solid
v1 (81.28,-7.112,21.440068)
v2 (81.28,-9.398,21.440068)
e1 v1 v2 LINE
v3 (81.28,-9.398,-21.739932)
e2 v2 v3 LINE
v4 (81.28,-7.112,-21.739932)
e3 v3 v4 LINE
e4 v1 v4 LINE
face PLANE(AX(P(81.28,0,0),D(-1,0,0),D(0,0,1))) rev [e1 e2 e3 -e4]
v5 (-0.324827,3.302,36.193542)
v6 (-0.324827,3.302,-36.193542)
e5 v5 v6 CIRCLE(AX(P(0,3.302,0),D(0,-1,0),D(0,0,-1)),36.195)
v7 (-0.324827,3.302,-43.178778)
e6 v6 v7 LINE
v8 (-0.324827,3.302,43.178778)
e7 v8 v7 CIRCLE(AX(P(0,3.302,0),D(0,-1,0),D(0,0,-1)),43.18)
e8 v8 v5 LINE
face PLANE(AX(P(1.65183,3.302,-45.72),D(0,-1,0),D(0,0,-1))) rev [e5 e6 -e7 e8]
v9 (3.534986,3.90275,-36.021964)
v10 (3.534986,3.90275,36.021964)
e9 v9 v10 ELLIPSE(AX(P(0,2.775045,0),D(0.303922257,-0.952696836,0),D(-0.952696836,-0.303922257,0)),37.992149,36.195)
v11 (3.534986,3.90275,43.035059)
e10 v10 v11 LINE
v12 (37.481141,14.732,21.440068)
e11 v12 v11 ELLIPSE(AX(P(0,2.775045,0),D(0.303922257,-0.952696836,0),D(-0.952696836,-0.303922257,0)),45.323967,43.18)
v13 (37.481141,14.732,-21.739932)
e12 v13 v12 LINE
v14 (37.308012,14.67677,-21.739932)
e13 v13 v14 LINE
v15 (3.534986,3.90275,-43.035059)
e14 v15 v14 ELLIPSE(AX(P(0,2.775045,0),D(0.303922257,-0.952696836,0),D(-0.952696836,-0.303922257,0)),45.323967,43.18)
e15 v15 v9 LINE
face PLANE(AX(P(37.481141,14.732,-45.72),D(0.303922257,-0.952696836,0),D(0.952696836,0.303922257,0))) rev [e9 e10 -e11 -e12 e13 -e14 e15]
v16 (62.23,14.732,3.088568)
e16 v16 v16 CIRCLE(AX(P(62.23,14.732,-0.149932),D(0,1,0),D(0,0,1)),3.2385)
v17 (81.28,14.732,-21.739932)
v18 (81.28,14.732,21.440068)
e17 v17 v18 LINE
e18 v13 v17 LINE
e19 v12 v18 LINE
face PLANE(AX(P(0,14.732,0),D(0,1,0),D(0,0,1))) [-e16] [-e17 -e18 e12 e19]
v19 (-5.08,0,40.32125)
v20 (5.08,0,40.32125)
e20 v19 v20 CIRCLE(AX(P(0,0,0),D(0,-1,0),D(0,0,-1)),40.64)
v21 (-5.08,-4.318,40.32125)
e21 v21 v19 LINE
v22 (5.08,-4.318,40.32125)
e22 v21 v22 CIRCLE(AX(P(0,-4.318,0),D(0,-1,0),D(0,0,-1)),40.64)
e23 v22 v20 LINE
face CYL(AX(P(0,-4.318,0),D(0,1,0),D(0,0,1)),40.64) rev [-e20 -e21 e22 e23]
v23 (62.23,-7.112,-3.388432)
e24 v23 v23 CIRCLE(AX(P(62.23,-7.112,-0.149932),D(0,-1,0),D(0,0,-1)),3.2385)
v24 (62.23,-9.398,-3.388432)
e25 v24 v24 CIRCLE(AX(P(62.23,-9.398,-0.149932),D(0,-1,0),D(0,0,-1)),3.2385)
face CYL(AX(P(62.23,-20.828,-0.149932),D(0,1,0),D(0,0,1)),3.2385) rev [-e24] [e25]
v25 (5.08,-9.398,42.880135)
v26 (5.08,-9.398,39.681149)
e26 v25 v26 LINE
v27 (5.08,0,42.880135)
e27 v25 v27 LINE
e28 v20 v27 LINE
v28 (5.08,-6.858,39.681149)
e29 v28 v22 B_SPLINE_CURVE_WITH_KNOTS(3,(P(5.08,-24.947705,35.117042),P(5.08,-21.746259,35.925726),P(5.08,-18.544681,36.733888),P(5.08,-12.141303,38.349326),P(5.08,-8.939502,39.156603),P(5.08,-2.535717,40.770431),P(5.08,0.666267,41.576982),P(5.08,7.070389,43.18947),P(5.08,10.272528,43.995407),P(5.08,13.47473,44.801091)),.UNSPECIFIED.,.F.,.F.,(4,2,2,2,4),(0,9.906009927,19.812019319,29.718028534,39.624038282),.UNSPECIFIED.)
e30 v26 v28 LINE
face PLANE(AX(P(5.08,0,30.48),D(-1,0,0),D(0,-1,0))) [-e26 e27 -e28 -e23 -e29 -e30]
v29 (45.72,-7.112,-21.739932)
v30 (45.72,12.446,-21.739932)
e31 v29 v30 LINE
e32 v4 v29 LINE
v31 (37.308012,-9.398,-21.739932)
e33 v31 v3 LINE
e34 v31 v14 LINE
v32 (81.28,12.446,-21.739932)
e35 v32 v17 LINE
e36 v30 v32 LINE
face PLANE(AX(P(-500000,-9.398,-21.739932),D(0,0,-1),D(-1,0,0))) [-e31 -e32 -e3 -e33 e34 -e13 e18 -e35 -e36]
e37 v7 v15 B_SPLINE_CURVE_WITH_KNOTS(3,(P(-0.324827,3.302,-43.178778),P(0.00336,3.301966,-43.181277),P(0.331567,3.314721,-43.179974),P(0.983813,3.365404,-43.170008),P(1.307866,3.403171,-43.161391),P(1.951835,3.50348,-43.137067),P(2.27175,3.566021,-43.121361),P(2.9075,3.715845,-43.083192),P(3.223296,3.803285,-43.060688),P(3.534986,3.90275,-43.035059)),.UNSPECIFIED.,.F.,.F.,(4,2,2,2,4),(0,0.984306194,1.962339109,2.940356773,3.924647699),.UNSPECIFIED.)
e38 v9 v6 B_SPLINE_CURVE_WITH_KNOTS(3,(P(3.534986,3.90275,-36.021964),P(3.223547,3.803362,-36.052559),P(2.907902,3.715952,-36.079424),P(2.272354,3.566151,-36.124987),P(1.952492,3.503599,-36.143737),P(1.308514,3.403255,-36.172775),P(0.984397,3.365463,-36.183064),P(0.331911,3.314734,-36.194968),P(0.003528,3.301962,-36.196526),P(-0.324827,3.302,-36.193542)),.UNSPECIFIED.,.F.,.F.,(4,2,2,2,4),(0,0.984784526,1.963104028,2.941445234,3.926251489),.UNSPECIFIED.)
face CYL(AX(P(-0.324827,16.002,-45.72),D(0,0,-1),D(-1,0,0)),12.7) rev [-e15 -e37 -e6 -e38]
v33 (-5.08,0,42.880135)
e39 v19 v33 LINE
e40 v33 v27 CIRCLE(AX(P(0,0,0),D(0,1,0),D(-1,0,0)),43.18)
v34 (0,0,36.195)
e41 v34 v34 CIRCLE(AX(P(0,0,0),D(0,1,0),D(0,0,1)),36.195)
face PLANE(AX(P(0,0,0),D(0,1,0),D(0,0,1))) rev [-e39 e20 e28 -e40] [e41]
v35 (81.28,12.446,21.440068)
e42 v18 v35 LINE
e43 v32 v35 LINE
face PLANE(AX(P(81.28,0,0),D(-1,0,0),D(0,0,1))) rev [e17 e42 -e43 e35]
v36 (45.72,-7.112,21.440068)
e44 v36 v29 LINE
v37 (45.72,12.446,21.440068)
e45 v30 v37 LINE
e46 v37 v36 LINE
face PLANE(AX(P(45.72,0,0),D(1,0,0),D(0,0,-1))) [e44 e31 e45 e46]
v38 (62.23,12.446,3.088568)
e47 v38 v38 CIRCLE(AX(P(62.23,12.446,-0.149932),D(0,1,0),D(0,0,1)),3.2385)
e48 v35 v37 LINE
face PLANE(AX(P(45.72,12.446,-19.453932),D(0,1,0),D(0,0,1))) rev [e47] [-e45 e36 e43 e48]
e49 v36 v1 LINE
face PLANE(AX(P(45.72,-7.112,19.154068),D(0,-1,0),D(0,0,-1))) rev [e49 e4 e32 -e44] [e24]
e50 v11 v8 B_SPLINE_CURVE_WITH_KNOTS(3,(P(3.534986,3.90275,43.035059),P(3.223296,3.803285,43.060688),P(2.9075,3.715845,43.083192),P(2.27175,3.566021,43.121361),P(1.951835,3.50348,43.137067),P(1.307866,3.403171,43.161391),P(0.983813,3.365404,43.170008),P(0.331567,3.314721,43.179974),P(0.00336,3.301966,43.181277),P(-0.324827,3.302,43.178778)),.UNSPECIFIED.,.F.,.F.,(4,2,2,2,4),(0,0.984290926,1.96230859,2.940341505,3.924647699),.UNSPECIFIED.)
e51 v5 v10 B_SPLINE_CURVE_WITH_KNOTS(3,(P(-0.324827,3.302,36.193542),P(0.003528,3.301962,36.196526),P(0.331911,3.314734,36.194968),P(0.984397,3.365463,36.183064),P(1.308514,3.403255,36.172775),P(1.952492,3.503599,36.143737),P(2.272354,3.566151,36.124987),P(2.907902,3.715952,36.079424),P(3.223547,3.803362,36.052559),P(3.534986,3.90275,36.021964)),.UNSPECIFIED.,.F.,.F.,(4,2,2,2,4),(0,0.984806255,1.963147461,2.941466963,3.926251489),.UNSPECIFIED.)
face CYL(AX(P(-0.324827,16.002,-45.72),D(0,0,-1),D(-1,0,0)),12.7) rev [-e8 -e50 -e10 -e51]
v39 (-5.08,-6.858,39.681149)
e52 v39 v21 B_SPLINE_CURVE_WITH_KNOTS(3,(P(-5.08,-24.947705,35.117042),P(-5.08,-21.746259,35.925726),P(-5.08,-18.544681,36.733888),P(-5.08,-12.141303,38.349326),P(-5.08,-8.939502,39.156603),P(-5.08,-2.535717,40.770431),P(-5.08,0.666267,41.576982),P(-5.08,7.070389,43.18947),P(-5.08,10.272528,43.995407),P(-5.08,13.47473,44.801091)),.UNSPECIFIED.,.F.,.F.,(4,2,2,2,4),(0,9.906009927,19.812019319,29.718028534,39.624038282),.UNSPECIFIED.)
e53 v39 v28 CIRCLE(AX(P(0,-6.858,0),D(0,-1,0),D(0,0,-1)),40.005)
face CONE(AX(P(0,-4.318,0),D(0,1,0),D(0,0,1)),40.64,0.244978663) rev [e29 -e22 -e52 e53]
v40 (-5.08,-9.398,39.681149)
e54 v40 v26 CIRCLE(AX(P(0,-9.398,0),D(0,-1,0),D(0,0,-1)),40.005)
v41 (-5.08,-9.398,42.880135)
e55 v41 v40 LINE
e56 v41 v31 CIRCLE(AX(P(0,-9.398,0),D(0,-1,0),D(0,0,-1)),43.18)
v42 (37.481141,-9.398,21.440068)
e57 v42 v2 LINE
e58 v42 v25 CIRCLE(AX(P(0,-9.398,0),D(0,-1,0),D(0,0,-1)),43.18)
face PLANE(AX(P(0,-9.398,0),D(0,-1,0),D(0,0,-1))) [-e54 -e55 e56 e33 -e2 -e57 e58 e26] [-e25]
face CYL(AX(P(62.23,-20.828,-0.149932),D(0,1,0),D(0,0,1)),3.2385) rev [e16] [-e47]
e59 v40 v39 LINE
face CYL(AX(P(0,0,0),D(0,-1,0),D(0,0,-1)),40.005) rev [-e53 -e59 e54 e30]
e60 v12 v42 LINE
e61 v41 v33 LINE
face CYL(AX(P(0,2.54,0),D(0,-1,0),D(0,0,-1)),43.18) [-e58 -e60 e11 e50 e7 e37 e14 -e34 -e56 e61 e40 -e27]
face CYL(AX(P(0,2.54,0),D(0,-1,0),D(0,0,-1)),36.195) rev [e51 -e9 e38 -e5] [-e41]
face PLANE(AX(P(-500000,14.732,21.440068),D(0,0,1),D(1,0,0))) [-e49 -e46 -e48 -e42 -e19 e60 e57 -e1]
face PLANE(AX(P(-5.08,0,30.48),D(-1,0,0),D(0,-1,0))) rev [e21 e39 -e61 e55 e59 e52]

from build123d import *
from build123d.topology import SkipClean

# Parameters (mm, degrees)
SKETCH1_R                = 43.18
SKETCH1_R_2              = 38.1
SKETCH1_R_3              = 36.195
BOSS_EXTRUDE1_DEPTH      = 2.54
BOSS_EXTRUDE2_START      = 4.318
SKETCH2_R                = 43.18
SKETCH2_R_2              = 40.64
BOSS_EXTRUDE2_DEPTH      = 4.318
SKETCH7_W                = 5.08
SKETCH7_H                = 10.16
CUT_EXTRUDE1_DEPTH       = 12.7
SKETCH12_R               = 43.18
SKETCH12_R_2             = 36.195
BOSS_EXTRUDE3_DEPTH      = 12.192
BOSS_EXTRUDE4_REACH      = 99.671
BOSS_EXTRUDE4_END_RADIUS = 43.18
SKETCH13_W               = 43.18
SKETCH13_H               = 24.13
BOSS_EXTRUDE5_DEPTH      = 38.1
SKETCH14_W               = 38.608
SKETCH14_H               = 19.558
CUT_EXTRUDE2_DEPTH       = 35.56
SKETCH17_R               = 3.2385
CUT_EXTRUDE3_DEPTH       = 35.56
CUT_EXTRUDE5_DEPTH       = 88.9
FILLET1_R                = 12.7
SKETCH23_W               = 35.56
SKETCH23_H               = 19.558
CUT_EXTRUDE6_DEPTH       = 50.8


with BuildPart() as part:
    # Sketch1 → Boss-Extrude1 (new body)
    # profile 1 of 2: a face of its own
    with BuildSketch(Plane(origin=(0, 0, 0), x_dir=(1, 0, 0), z_dir=(0, 1, 0))):
        with Locations(Location((0, 0, 0), (0, 0, 270))):
            Circle(SKETCH1_R)
        Circle(SKETCH1_R_2, mode=Mode.SUBTRACT)
    # profile 2 of 2: a face of its own
    with BuildSketch(Plane(origin=(0, 0, 0), x_dir=(1, 0, 0), z_dir=(0, 1, 0))):
        Circle(SKETCH1_R_2)
        with Locations(Location((0, 0, 0), (0, 0, 270))):
            Circle(SKETCH1_R_3, mode=Mode.SUBTRACT)
    extrude(amount=BOSS_EXTRUDE1_DEPTH)

    # Sketch2 → Boss-Extrude2 (add)
    with BuildSketch(Plane.XZ.offset(BOSS_EXTRUDE2_START)):
        with Locations(Location((0, 0, 0), (0, 0, 270))):
            Circle(SKETCH2_R)
        with Locations(Location((0, 0, 0), (0, 0, 270))):
            Circle(SKETCH2_R_2, mode=Mode.SUBTRACT)
    extrude(amount=-BOSS_EXTRUDE2_DEPTH)

    # Sketch3 → Revolve1 (revolve)
    with BuildSketch(Plane.XY, mode=Mode.PRIVATE) as revolve1_sk:
        Polygon((-40.64, -4.318), (-43.18, -4.318), (-43.18, -9.398), (-40.005, -9.398), (-40.005, -6.858), align=None)
    revolve(revolve1_sk.sketch.rotate(Axis((0, 0, 0), (0, 1, 0)), 270), axis=Axis((0, 0, 0), (0, 1, 0)))

    # Sketch7 → Cut-Extrude1 (cut)
    with SkipClean():  # the faces are left unmerged after this step: merging them gives an invalid solid
        with BuildSketch(Plane.XY.offset(43.18)):
            with Locations((-2.54, -5.08)):
                Rectangle(SKETCH7_W, SKETCH7_H)
            with Locations((2.54, -5.08)):
                Rectangle(SKETCH7_W, SKETCH7_H)
        extrude(amount=-CUT_EXTRUDE1_DEPTH, mode=Mode.SUBTRACT)

    # Sketch12 → Boss-Extrude3 (add)
    with SkipClean():  # the faces are left unmerged after this step: merging them gives an invalid solid
        with BuildSketch(Plane(origin=(0, 2.54, 0), x_dir=(1, 0, 0), z_dir=(0, 1, 0))):
            with Locations(Location((0, 0, 0), (0, 0, 263.243672969))):
                Circle(SKETCH12_R)
            with Locations(Location((0, 0, 0), (0, 0, 270))):
                Circle(SKETCH12_R_2, mode=Mode.SUBTRACT)
        extrude(amount=BOSS_EXTRUDE3_DEPTH)

    # Boss-Extrude4: up to this cylinder (the profile starts outside it)
    with SkipClean():  # the faces are left unmerged after this step: merging them gives an invalid solid
        boss_extrude4_end = Plane(origin=(0, 2.667, 0), z_dir=(0, -1, 0)) * Cylinder(BOSS_EXTRUDE4_END_RADIUS, 286.702, mode=Mode.PRIVATE)
        # Sketch8 → Boss-Extrude4 (add, up to the surface)
        with BuildSketch(Plane(origin=(43.18, 0, 0), x_dir=(0, 0, -1), z_dir=(1, 0, 0)), mode=Mode.PRIVATE) as boss_extrude4_sk1:
            Polygon((0.14993237, -9.398), (21.73993237, -9.398), (21.73993237, 14.732), (-21.44006763, 14.732), (-21.44006763, -9.398), align=None)
        boss_extrude4_tool1 = extrude(boss_extrude4_sk1.sketch, amount=-BOSS_EXTRUDE4_REACH, mode=Mode.PRIVATE) - boss_extrude4_end
        add(boss_extrude4_tool1.solids().sort_by_distance((43.18, 2.667, -0.149932))[0])
        add(boss_extrude4_tool1.solids().sort_by_distance((43.18, 2.667, -0.149932))[1])

    # Sketch13 → Boss-Extrude5 (add)
    with SkipClean():  # the faces are left unmerged after this step: merging them gives an invalid solid
        with BuildSketch(Plane(origin=(43.18, 0, 0), x_dir=(0, 0, -1), z_dir=(1, 0, 0))):
            with Locations((0.14993237, 2.667)):
                Rectangle(SKETCH13_W, SKETCH13_H)
        extrude(amount=BOSS_EXTRUDE5_DEPTH)

    # Sketch14 → Cut-Extrude2 (cut)
    with SkipClean():  # the faces are left unmerged after this step: merging them gives an invalid solid
        with BuildSketch(Plane(origin=(81.28, 0, 0), x_dir=(0, 0, -1), z_dir=(1, 0, 0))):
            with Locations((0.14993237, 2.667)):
                Rectangle(SKETCH14_W, SKETCH14_H)
        extrude(amount=-CUT_EXTRUDE2_DEPTH, mode=Mode.SUBTRACT)

    # Sketch17 → Cut-Extrude3 (cut)
    with SkipClean():  # the faces are left unmerged after this step: merging them gives an invalid solid
        with BuildSketch(Plane(origin=(0, 14.732, 0), x_dir=(1, 0, 0), z_dir=(0, 1, 0))):
            with Locations(Location((62.23, 0.14993237, 0), (0, 0, 90))):
                Circle(SKETCH17_R)
        extrude(amount=-CUT_EXTRUDE3_DEPTH, mode=Mode.SUBTRACT)

    # Sketch22 → Cut-Extrude5 (cut)
    with SkipClean():  # the faces are left unmerged after this step: merging them gives an invalid solid
        with BuildSketch(Plane.XY.offset(43.18)):
            Polygon((37.481140591, 14.732), (1.651830342, 3.302), (-49.162594564, 3.302), (-49.162594564, 14.732), align=None)
        extrude(amount=-CUT_EXTRUDE5_DEPTH, mode=Mode.SUBTRACT)

    # Fillet1
    # the kernel refuses this fillet: 12.7 mm, written as the material it adds along each edge
    with BuildSketch(Plane(origin=(1.651830342, 3.302, -31.215644567), x_dir=(0.9526968361956157, 0.30392225700475445, 0), z_dir=(0, 0, -1))) as fillet1_piece_1_section:
        with BuildLine():
            CenterArc((FILLET1_R * 0.155642315474, -FILLET1_R), FILLET1_R, 90, 17.69333606)
            Line((-FILLET1_R * 0.14827994153, -FILLET1_R * 0.0473031638044), (0, 0))
            Line((0, 0), (FILLET1_R * 0.155642315474, 0))
        make_face()
    fillet1_piece_1 = extrude(amount=16.87439239, mode=Mode.PRIVATE)
    fillet1_piece_1 = fillet1_piece_1 & Plane(origin=(0, 3.342340144, 0), x_dir=(-0.11764705883067372, 0, 0.9930554715364556), z_dir=(0, -1, 0)) * Cylinder(43.18, 42, mode=Mode.PRIVATE)
    fillet1_piece_1 = fillet1_piece_1 - Plane(origin=(0, 3.342340144, 0), x_dir=(0, 0, 1), z_dir=(0, -1, 0)) * Cylinder(36.195, 42, mode=Mode.PRIVATE)
    add(fillet1_piece_1)
    with BuildSketch(Plane(origin=(1.651830342, 3.302, 48.090036957), x_dir=(0.9526968361956157, 0.30392225700475445, 0), z_dir=(0, 0, -1))) as fillet1_piece_2_section:
        with BuildLine():
            CenterArc((FILLET1_R * 0.155642315474, -FILLET1_R), FILLET1_R, 90, 17.69333606)
            Line((-FILLET1_R * 0.14827994153, -FILLET1_R * 0.0473031638044), (0, 0))
            Line((0, 0), (FILLET1_R * 0.155642315474, 0))
        make_face()
    fillet1_piece_2 = extrude(amount=16.87439239, mode=Mode.PRIVATE)
    fillet1_piece_2 = fillet1_piece_2 & Plane(origin=(0, 3.342340147, 0), x_dir=(-0.11764705883067372, 0, 0.9930554715364556), z_dir=(0, -1, 0)) * Cylinder(43.18, 42, mode=Mode.PRIVATE)
    fillet1_piece_2 = fillet1_piece_2 - Plane(origin=(0, 3.342340147, 0), x_dir=(0, 0, 1), z_dir=(0, -1, 0)) * Cylinder(36.195, 42, mode=Mode.PRIVATE)
    add(fillet1_piece_2)

    # Sketch23 → Cut-Extrude6 (cut)
    with BuildSketch(Plane.XY.offset(21.44006763)):
        with Locations((63.5, 2.667)):
            Rectangle(SKETCH23_W, SKETCH23_H)
    extrude(amount=-CUT_EXTRUDE6_DEPTH, mode=Mode.SUBTRACT)


solid = part.part
